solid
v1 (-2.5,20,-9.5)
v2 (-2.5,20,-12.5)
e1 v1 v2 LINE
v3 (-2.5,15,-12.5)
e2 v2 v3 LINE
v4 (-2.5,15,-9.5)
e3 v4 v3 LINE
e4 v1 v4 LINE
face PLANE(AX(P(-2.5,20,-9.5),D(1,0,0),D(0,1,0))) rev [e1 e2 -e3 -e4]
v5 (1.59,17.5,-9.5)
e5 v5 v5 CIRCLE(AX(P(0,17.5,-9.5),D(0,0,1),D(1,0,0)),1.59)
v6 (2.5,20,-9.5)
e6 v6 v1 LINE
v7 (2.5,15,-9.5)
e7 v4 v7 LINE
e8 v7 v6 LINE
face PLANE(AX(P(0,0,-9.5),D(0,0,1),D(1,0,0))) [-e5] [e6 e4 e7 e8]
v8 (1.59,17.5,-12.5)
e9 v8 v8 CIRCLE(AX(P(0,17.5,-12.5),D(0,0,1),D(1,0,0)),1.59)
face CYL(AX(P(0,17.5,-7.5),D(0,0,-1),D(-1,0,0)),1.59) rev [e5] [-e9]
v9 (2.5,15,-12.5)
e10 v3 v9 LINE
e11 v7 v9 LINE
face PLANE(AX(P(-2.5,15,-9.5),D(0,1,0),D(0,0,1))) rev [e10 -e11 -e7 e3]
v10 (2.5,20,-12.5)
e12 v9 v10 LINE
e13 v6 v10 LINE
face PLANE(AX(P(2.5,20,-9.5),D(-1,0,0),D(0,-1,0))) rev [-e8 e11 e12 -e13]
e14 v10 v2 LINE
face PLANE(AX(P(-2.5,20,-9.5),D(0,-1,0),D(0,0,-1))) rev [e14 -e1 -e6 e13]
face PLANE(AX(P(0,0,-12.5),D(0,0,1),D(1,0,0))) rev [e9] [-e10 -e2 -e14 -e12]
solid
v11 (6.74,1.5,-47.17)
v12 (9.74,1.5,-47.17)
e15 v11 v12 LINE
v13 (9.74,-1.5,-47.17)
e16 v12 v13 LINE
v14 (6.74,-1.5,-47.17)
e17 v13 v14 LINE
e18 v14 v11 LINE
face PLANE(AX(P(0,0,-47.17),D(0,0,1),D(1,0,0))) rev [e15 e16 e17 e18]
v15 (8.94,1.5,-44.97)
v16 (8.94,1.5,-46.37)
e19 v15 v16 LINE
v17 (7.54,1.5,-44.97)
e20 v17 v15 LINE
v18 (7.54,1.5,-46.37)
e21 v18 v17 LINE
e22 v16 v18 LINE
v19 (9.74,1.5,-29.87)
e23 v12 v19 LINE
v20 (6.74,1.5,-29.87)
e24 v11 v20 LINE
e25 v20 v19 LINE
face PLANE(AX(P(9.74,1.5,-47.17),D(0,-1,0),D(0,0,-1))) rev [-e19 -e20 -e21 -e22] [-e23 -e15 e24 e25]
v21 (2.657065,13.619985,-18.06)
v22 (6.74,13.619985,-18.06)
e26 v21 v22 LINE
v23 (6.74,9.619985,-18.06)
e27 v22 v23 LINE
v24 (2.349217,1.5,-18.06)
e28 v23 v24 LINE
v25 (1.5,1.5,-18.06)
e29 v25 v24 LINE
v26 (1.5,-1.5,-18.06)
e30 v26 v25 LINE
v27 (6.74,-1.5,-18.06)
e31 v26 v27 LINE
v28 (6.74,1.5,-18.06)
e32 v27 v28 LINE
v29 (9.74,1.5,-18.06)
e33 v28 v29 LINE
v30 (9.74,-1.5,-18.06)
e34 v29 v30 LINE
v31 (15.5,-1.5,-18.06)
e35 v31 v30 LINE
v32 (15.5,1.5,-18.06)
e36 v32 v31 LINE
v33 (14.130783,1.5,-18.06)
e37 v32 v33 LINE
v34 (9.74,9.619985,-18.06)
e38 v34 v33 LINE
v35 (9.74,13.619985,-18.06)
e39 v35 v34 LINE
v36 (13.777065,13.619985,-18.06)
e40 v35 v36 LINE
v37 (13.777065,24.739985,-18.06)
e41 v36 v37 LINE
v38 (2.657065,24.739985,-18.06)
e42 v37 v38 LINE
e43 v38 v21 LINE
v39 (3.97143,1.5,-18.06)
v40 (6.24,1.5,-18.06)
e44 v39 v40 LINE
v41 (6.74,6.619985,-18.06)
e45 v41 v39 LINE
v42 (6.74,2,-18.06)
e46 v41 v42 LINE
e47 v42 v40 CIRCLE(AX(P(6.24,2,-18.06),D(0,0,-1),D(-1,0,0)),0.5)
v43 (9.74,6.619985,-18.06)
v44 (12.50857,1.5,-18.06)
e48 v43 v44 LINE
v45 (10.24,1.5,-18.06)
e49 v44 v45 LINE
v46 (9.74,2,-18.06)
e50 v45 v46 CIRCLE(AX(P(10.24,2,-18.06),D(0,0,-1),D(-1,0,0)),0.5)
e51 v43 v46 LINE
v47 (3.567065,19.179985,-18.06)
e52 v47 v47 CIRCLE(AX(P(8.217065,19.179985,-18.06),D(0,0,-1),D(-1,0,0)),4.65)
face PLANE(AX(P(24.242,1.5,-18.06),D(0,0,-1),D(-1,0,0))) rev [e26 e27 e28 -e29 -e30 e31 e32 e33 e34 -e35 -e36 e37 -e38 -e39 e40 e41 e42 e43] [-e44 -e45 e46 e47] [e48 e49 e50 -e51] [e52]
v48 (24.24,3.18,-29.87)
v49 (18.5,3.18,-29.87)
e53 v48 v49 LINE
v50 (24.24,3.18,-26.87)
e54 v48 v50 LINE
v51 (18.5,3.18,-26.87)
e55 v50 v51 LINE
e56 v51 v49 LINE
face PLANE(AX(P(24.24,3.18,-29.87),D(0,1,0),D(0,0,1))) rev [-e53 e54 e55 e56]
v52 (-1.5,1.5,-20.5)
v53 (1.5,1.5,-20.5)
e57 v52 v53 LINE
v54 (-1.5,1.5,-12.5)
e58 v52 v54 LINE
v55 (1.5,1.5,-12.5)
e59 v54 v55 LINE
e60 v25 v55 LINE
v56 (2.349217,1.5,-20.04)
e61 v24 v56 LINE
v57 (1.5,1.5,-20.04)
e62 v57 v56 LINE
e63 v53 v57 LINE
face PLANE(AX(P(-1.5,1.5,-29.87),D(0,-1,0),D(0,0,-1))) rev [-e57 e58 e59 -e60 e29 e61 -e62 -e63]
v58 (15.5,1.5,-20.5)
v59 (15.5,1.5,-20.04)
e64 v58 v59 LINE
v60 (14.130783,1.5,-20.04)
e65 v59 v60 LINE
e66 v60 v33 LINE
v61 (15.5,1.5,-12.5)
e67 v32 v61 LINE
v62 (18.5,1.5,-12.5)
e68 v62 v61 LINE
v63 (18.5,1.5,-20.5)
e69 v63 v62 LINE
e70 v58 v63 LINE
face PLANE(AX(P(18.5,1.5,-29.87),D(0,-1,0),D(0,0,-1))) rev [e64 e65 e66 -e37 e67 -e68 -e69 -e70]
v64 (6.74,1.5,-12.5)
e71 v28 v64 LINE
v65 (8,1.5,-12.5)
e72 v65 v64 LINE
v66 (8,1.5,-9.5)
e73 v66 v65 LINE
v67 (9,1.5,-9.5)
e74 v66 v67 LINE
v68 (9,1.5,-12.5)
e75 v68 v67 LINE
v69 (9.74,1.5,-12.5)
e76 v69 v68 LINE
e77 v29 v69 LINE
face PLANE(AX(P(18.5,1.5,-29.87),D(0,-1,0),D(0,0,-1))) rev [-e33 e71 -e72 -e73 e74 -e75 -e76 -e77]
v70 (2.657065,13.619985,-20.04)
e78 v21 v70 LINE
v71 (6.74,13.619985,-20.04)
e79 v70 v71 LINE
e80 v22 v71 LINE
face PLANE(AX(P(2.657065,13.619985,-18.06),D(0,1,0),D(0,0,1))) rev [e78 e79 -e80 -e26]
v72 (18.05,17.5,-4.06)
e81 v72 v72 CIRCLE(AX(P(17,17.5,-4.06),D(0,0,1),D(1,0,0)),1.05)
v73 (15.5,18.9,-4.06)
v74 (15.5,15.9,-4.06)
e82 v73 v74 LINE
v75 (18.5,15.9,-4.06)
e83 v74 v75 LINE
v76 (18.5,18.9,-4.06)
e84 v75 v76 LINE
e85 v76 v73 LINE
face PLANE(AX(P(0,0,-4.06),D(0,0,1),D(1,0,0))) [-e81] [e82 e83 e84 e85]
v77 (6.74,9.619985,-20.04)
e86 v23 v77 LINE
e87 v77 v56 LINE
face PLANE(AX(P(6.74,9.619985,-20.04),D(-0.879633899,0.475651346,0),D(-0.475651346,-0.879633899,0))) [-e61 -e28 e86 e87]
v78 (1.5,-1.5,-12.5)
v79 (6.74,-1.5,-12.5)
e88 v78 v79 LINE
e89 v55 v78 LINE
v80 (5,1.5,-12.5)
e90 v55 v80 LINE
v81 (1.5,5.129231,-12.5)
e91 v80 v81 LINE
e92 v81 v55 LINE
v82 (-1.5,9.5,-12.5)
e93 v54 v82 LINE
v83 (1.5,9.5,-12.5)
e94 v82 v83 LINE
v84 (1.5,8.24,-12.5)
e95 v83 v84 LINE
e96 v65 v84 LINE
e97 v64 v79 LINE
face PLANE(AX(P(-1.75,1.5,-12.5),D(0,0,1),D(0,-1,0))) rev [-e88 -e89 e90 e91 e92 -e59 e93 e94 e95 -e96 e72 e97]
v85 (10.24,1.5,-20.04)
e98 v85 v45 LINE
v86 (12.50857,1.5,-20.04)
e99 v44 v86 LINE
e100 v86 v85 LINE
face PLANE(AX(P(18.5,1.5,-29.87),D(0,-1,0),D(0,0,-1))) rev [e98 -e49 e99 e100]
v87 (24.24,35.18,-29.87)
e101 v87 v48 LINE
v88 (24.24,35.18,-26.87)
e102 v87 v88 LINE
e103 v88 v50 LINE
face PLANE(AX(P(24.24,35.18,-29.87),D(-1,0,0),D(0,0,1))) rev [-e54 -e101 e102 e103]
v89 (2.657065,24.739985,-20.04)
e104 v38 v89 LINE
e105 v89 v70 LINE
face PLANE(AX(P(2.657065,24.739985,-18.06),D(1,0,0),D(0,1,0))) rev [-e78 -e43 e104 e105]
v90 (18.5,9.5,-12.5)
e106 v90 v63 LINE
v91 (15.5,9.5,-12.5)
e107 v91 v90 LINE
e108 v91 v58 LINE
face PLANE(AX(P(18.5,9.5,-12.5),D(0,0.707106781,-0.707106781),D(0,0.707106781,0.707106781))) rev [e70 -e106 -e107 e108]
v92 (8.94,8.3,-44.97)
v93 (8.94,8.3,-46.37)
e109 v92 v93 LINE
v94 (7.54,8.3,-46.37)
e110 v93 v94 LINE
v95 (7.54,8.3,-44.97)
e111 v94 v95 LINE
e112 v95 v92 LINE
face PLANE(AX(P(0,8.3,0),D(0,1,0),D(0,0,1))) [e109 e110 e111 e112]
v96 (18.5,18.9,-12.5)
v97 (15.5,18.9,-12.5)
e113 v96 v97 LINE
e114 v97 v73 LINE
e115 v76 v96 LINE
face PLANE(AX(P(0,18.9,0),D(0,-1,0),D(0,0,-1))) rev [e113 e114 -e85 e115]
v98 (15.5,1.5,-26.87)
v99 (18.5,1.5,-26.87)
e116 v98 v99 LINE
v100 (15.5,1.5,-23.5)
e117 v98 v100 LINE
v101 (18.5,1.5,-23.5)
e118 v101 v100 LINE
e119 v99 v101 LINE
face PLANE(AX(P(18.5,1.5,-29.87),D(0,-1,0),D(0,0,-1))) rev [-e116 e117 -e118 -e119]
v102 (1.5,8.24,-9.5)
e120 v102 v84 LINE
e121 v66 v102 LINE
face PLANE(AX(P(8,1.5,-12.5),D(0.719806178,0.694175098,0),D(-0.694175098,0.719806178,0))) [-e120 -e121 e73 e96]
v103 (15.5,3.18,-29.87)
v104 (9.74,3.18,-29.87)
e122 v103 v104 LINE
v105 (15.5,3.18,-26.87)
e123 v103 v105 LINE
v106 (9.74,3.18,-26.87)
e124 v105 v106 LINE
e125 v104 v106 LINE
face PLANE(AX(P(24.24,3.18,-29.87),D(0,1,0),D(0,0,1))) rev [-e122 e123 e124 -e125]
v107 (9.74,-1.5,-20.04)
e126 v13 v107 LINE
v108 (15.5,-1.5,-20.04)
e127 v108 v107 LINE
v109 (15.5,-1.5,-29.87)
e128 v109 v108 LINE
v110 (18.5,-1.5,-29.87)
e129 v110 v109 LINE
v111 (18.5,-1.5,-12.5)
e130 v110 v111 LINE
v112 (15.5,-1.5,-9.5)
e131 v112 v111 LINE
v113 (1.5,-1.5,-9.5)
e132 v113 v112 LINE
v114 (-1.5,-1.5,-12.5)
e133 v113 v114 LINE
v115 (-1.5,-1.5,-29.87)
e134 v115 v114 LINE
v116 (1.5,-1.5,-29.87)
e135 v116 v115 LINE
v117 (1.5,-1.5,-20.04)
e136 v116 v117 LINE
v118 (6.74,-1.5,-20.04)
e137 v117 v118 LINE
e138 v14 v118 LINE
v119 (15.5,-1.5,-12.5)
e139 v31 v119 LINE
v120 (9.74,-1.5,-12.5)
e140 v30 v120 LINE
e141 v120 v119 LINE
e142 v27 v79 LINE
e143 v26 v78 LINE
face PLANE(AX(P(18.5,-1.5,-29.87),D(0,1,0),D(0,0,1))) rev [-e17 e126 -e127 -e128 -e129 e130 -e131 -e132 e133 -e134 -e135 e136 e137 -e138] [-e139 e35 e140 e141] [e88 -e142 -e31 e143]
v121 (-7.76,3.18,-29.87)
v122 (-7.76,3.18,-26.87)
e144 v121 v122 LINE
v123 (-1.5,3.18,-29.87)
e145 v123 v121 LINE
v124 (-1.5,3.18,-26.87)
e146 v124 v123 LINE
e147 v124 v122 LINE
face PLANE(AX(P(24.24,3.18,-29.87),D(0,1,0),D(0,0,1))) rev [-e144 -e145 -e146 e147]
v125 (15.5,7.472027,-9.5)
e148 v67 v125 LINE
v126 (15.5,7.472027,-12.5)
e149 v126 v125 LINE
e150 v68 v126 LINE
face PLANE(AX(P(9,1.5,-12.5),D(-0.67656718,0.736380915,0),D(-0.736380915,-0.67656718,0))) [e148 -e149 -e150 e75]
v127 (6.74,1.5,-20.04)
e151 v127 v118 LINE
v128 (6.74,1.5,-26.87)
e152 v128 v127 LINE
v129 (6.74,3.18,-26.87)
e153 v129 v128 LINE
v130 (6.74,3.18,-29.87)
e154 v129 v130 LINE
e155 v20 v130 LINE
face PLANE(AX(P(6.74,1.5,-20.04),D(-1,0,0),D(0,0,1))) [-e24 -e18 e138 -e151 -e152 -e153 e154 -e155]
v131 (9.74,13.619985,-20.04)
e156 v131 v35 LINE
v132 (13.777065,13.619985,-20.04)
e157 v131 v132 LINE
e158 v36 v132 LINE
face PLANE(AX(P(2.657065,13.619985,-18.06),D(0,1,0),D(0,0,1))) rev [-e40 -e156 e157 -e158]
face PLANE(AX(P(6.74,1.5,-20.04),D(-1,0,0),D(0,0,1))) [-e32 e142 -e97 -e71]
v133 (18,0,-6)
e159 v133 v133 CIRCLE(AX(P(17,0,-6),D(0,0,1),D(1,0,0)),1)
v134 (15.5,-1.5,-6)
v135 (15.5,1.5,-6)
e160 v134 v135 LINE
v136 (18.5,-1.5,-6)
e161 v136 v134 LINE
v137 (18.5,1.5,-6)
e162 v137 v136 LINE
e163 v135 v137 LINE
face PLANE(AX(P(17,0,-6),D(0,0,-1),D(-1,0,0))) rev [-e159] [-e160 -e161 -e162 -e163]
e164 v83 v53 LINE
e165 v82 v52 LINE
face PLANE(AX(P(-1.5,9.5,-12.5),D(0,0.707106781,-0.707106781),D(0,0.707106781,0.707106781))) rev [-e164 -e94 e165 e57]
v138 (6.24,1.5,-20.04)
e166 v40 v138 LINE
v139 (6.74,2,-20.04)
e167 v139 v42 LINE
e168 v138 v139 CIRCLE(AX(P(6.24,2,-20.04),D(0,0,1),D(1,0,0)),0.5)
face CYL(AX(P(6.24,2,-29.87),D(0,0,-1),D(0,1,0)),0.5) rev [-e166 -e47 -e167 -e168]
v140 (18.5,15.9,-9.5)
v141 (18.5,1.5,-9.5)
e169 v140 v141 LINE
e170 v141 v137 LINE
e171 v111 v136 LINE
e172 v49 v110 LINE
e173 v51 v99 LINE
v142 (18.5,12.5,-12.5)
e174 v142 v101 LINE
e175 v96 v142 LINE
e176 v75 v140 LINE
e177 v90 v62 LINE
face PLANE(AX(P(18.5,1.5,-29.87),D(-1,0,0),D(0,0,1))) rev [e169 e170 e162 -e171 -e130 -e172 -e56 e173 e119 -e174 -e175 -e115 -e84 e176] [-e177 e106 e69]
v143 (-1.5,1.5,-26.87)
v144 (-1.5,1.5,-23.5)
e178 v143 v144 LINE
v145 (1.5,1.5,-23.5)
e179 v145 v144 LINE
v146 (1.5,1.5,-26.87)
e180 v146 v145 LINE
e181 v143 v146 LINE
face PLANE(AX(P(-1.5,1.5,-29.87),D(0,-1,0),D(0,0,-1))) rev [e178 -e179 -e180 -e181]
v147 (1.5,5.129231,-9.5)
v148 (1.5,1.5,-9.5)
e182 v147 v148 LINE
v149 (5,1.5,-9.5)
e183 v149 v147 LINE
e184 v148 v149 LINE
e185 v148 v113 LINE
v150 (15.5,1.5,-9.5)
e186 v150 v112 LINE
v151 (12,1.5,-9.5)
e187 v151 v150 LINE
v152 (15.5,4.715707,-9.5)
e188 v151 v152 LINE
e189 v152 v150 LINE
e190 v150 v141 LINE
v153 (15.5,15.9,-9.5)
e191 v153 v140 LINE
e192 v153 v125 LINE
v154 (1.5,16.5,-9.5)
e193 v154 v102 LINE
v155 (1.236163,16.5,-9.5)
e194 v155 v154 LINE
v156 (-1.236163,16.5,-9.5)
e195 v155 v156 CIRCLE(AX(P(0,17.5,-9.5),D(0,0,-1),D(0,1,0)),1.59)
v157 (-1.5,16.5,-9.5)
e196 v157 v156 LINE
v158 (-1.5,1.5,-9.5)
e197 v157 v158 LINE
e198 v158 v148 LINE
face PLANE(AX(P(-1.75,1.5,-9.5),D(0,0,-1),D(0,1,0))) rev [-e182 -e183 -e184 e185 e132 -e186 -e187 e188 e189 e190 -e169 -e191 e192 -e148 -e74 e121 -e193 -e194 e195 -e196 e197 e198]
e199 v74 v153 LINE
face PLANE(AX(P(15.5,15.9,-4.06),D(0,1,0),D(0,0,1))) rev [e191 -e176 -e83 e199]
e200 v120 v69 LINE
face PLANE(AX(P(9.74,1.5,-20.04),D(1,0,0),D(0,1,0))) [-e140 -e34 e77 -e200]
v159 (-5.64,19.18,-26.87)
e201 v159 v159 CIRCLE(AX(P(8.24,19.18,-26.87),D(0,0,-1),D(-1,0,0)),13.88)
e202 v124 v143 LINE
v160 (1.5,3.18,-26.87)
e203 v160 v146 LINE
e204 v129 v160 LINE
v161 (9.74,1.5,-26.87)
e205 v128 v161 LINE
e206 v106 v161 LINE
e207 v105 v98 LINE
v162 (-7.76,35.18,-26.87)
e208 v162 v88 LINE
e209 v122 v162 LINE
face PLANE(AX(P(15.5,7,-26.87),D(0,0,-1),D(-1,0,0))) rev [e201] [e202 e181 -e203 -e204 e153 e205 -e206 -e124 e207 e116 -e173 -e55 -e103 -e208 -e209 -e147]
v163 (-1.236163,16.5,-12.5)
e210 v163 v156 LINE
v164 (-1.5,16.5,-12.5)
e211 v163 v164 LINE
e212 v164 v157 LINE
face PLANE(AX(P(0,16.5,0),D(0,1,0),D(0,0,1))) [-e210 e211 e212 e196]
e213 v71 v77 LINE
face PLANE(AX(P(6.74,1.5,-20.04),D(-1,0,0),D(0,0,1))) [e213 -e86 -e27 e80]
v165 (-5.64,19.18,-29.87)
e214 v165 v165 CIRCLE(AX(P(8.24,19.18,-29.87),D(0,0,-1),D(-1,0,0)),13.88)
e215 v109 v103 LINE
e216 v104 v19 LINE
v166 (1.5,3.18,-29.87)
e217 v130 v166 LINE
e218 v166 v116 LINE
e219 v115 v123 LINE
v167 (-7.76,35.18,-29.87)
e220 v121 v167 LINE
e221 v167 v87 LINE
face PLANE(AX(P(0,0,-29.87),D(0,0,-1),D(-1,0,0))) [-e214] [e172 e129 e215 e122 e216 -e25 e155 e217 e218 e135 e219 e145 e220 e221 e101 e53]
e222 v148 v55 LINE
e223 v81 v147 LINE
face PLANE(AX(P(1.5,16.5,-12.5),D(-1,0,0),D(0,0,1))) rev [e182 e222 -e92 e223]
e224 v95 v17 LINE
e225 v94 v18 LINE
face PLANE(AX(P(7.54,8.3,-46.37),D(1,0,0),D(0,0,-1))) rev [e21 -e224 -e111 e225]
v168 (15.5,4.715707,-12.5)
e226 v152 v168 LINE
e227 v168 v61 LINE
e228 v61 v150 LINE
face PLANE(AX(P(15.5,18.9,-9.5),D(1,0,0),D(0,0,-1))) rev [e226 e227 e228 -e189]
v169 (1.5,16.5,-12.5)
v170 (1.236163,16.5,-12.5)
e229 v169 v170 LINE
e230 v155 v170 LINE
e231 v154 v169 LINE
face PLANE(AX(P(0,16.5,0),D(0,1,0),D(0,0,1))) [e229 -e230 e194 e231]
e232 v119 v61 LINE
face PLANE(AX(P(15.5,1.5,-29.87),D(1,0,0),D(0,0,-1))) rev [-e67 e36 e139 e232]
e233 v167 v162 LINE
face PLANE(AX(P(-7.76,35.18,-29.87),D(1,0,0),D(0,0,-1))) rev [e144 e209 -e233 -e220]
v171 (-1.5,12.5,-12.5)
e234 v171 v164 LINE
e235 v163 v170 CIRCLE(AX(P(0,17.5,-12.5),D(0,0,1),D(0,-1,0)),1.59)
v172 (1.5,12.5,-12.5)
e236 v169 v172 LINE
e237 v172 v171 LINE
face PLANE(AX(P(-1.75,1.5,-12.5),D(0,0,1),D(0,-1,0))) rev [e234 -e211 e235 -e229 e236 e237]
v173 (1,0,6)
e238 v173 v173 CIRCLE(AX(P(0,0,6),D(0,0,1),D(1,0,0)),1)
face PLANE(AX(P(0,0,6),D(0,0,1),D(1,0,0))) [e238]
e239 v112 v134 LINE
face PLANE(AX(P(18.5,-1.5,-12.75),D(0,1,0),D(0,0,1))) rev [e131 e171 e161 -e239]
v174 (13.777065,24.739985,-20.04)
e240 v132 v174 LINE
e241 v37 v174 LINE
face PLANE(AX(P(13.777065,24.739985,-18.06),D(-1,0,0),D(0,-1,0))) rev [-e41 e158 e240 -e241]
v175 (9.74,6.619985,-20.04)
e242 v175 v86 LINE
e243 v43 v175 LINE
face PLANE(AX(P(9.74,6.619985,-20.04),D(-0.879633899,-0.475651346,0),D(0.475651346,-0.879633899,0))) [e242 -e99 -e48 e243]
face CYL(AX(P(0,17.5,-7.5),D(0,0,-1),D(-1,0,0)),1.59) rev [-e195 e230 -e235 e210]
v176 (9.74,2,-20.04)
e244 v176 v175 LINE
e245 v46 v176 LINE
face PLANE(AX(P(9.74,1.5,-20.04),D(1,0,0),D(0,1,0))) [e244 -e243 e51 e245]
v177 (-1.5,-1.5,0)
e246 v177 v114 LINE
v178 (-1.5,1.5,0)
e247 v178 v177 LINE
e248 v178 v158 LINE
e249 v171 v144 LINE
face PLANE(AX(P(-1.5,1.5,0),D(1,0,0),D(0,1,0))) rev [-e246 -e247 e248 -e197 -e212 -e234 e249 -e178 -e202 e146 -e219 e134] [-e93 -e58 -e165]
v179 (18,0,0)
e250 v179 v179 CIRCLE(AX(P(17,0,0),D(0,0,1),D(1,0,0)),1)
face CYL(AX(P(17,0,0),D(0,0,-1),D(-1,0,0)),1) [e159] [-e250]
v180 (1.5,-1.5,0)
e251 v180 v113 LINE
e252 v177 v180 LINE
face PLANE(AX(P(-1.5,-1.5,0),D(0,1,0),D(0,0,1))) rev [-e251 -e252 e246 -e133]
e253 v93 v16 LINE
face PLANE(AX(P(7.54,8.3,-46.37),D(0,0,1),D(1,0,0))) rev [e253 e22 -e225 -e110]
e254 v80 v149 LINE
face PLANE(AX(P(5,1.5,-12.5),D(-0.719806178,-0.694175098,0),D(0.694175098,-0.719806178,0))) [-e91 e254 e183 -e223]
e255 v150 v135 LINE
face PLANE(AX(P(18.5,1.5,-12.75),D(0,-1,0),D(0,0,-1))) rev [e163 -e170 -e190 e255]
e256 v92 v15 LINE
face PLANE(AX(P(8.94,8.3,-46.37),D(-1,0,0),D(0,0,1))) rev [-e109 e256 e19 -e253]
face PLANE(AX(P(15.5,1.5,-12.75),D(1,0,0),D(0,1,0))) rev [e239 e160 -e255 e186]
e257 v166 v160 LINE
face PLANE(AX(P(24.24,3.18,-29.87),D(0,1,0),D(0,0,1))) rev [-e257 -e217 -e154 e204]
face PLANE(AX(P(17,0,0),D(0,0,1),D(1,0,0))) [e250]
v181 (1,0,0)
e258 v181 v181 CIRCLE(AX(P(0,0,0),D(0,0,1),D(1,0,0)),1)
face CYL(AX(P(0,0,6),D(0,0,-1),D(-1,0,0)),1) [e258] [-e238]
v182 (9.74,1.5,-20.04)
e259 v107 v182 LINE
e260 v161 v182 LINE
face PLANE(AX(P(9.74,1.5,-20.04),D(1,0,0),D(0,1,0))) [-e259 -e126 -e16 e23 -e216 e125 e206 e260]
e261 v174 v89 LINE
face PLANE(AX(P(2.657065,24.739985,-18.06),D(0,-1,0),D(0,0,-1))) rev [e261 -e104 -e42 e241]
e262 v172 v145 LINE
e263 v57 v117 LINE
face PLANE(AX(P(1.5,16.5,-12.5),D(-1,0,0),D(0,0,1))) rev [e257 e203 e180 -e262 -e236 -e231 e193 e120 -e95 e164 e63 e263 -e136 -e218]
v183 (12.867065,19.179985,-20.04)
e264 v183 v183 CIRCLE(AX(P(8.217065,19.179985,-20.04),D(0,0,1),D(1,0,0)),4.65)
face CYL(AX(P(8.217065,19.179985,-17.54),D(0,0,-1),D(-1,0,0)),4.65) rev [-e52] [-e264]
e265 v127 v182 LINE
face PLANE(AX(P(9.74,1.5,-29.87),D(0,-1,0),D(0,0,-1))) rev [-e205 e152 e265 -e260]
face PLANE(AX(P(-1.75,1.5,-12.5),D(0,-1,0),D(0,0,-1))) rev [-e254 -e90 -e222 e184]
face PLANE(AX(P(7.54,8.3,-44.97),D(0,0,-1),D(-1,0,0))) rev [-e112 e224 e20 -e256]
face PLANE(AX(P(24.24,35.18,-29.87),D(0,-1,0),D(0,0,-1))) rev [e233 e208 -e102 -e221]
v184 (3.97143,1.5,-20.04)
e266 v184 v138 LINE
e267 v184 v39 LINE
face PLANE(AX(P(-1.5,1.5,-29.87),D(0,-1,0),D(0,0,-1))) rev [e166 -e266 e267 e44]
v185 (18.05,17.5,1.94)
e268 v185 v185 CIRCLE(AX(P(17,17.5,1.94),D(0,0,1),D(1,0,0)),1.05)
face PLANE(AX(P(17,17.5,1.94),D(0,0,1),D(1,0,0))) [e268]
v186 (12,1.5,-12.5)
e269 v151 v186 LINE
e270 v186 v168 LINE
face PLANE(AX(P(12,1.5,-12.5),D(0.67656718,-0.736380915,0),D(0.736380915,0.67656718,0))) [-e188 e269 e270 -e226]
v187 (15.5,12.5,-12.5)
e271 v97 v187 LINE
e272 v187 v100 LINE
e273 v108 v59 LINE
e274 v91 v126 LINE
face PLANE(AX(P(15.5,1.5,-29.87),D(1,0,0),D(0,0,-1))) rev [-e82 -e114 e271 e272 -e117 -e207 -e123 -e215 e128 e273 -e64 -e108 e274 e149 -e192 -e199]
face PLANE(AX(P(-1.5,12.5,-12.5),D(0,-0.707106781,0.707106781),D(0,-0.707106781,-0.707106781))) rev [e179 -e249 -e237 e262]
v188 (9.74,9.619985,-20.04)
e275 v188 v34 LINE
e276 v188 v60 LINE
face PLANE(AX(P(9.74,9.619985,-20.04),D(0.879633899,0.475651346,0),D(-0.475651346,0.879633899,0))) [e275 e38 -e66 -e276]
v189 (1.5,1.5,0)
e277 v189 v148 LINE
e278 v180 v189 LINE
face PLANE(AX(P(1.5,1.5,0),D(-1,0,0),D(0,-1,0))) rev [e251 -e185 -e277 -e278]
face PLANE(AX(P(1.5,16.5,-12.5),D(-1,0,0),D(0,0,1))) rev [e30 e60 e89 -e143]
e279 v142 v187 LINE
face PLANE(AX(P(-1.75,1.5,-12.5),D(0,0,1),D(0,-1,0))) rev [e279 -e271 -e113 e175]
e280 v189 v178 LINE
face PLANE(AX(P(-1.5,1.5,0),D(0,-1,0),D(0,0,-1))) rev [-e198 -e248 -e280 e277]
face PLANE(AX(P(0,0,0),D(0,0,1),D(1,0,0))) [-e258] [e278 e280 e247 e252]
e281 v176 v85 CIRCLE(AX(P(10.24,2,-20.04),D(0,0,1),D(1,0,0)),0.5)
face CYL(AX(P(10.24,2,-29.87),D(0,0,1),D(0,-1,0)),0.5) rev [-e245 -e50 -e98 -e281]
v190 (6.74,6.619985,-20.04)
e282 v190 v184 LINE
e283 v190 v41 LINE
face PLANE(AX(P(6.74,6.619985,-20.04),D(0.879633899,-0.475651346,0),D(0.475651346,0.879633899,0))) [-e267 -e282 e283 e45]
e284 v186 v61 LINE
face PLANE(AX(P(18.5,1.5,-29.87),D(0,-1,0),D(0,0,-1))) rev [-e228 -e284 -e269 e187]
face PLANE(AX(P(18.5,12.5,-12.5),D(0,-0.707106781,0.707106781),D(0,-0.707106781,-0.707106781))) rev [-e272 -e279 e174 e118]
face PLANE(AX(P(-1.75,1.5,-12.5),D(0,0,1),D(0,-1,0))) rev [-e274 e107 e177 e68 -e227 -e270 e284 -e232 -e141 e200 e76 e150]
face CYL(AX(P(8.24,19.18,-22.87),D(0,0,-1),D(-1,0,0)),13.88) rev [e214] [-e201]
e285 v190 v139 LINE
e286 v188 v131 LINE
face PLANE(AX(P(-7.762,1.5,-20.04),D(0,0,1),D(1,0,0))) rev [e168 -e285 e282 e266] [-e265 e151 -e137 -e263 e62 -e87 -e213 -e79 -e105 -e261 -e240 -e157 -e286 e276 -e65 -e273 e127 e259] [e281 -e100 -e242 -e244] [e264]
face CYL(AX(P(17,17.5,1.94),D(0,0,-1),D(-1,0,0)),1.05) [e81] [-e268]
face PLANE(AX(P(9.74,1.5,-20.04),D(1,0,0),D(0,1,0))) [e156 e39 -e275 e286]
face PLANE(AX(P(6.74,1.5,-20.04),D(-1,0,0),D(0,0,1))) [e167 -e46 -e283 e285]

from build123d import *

# Parameters (mm, degrees)
SKETCH3_W            = 3
SKETCH3_H            = 3
SKETCH7_W            = 3
SKETCH7_H            = 3
BOSS_EXTRUDE1_DEPTH  = 16.5
SKETCH12_W           = 5
SKETCH12_H           = 5
BOSS_EXTRUDE4_DEPTH  = 1.5
SKETCH17_R           = 1
BOSS_EXTRUDE5_DEPTH  = 6
SKETCH18_R           = 1
BOSS_EXTRUDE6_DEPTH  = 6
SKETCH19_W           = 3
SKETCH19_H           = 3
BOSS_EXTRUDE7_DEPTH  = 7.54
SKETCH21_W           = 3
SKETCH21_H           = 1.98
BOSS_EXTRUDE8_DEPTH  = 17.68
SKETCH22_W           = 11.12
SKETCH22_H           = 11.12
BOSS_EXTRUDE9_DEPTH  = 0.99
SKETCH23_R           = 4.65
CUT_EXTRUDE2_DEPTH   = 2.5
SKETCH24_W           = 3
SKETCH24_H           = 3
BOSS_EXTRUDE10_DEPTH = 9.83
SKETCH25_W           = 3
SKETCH25_H           = 3
BOSS_EXTRUDE11_DEPTH = 3
SKETCH27_W           = 32
SKETCH27_H           = 32
BOSS_EXTRUDE12_DEPTH = 1.5
SKETCH28_R           = 13.88
CUT_EXTRUDE3_DEPTH   = 7
SKETCH31_W           = 3
SKETCH31_H           = 3
BOSS_EXTRUDE13_DEPTH = 17.3
SKETCH32_W           = 1.4
SKETCH32_H           = 1.4
BOSS_EXTRUDE14_DEPTH = 6.8
SKETCH33_W           = 3
SKETCH33_H           = 3
BOSS_EXTRUDE15_DEPTH = 17.37
SKETCH34_W           = 3
SKETCH34_H           = 3
BOSS_EXTRUDE16_DEPTH = 5.5
SKETCH36_W           = 3
SKETCH36_H           = 3
SKETCH16_R           = 1.59
CUT_EXTRUDE7_DEPTH   = 5
SKETCH41_W           = 3
SKETCH41_H           = 3
BOSS_EXTRUDE17_DEPTH = 17.37
SKETCH42_W           = 3
SKETCH42_H           = 3
BOSS_EXTRUDE18_DEPTH = 5
SKETCH43_W           = 3
SKETCH43_H           = 3
BOSS_EXTRUDE19_DEPTH = 17.4
SKETCH47_W           = 3
SKETCH47_H           = 3
SKETCH53_W           = 3
SKETCH53_H           = 3
BOSS_EXTRUDE20_REACH = 63.391
SKETCH55_W           = 1.98
SKETCH55_H           = 3
BOSS_EXTRUDE21_REACH = 63.391
SKETCH56_W           = 1.98
SKETCH56_H           = 3
FILLET1_R            = 0.5
FILLET2_R            = 0.5
SKETCH57_W           = 1.98
SKETCH57_H           = 3
SKETCH59_W           = 3
SKETCH59_H           = 3
BOSS_EXTRUDE22_DEPTH = 5.44
SKETCH63_R           = 1.05
BOSS_EXTRUDE25_DEPTH = 6


with BuildPart() as part:
    # Sweep3: sweep along a path in Sketch4
    with BuildLine(Plane(origin=(0, 0, 0), x_dir=(1, 0, 0), z_dir=(0, 1, 0))) as sweep3_path:
        Line((0, 0), (0, 11))
        Line((0, 11), (17, 11))
        Line((17, 11), (17, 6))
    # Sketch3 → Sweep3 (sweep)
    with BuildSketch(Plane.XY):
        Rectangle(SKETCH3_W, SKETCH3_H)
    sweep(path=sweep3_path.line, transition=Transition.RIGHT)

    # Sketch7 → Boss-Extrude1 (add)
    with BuildSketch(Plane(origin=(0, 0, 0), x_dir=(1, 0, 0), z_dir=(0, 1, 0))):
        with Locations((0, 11)):
            Rectangle(SKETCH7_W, SKETCH7_H)
    extrude(amount=BOSS_EXTRUDE1_DEPTH)

    # Sketch17 → Boss-Extrude5 (add)
    with BuildSketch(Plane.XY):
        Circle(SKETCH17_R)
    extrude(amount=BOSS_EXTRUDE5_DEPTH)

    # Sketch18 → Boss-Extrude6 (add)
    with BuildSketch(Plane.XY.offset(-6)):
        with Locations((17, 0)):
            Circle(SKETCH18_R)
    extrude(amount=BOSS_EXTRUDE6_DEPTH)

    # Sweep4: sweep along a path in Sketch39
    with BuildLine(Plane.XY.offset(-11)) as sweep4_path:
        Line((6.5, 1.5), (0, 8.24))
    # Sketch36 → Sweep4 (sweep)
    with BuildSketch(Plane(origin=(0, 1.5, 0), x_dir=(1, 0, 0), z_dir=(0, 1, 0))):
        with Locations((6.5, 11)):
            Rectangle(SKETCH36_W, SKETCH36_H)
    sweep(path=sweep4_path.line)


with BuildPart() as body_2:
    # Sketch12 → Boss-Extrude4 (new, symmetric)
    with BuildSketch(Plane.XY.offset(-11)):
        with Locations((0, 17.5)):
            Rectangle(SKETCH12_W, SKETCH12_H)
    extrude(amount=BOSS_EXTRUDE4_DEPTH, both=True)


with BuildPart() as body_3:
    # Sketch19 → Boss-Extrude7 (new body)
    with BuildSketch(Plane.XY.offset(-12.5)):
        with Locations((8.24, 0)):
            Rectangle(SKETCH19_W, SKETCH19_H)
    extrude(amount=-BOSS_EXTRUDE7_DEPTH)

    # Sketch21 → Boss-Extrude8 (add)
    with BuildSketch(Plane(origin=(0, 1.5, 0), x_dir=(1, 0, 0), z_dir=(0, 1, 0))):
        with Locations((8.24, 19.05)):
            Rectangle(SKETCH21_W, SKETCH21_H)
    extrude(amount=BOSS_EXTRUDE8_DEPTH)

    # Sketch22 → Boss-Extrude9 (add, symmetric)
    with BuildSketch(Plane.XY.offset(-19.05)):
        with Locations((8.217064706, 19.179985124)):
            Rectangle(SKETCH22_W, SKETCH22_H)
    extrude(amount=BOSS_EXTRUDE9_DEPTH, both=True)

    # Sketch23 → Cut-Extrude2 (cut, symmetric)
    with BuildSketch(Plane(origin=(0, 0, -20.04), x_dir=(-1, 0, 0), z_dir=(0, 0, -1))):
        with Locations((-8.217064706, 19.179985124)):
            Circle(SKETCH23_R)
    extrude(amount=CUT_EXTRUDE2_DEPTH, both=True, mode=Mode.SUBTRACT)

    # Sketch24 → Boss-Extrude10 (add)
    with BuildSketch(Plane(origin=(0, 0, -20.04), x_dir=(-1, 0, 0), z_dir=(0, 0, -1))):
        with Locations((-8.24, 0)):
            Rectangle(SKETCH24_W, SKETCH24_H)
    extrude(amount=BOSS_EXTRUDE10_DEPTH)

    # Sketch25 → Boss-Extrude11 (add)
    with BuildSketch(Plane(origin=(0, 1.5, 0), x_dir=(1, 0, 0), z_dir=(0, 1, 0))):
        with Locations((8.24, 28.37)):
            Rectangle(SKETCH25_W, SKETCH25_H)
    extrude(amount=BOSS_EXTRUDE11_DEPTH)

    # Sketch27 → Boss-Extrude12 (add, symmetric)
    with BuildSketch(Plane(origin=(0, 0, -28.37), x_dir=(-1, 0, 0), z_dir=(0, 0, -1))):
        with Locations((-8.24, 19.18)):
            Rectangle(SKETCH27_W, SKETCH27_H)
    extrude(amount=BOSS_EXTRUDE12_DEPTH, both=True)

    # Sketch28 → Cut-Extrude3 (cut)
    with BuildSketch(Plane(origin=(0, 0, -29.87), x_dir=(-1, 0, 0), z_dir=(0, 0, -1))):
        with Locations((-8.24, 19.18)):
            Circle(SKETCH28_R)
    extrude(amount=-CUT_EXTRUDE3_DEPTH, mode=Mode.SUBTRACT)

    # Sketch31 → Boss-Extrude13 (add)
    with BuildSketch(Plane(origin=(0, 0, -29.87), x_dir=(-1, 0, 0), z_dir=(0, 0, -1))):
        with Locations((-8.24, 0)):
            Rectangle(SKETCH31_W, SKETCH31_H)
    extrude(amount=BOSS_EXTRUDE13_DEPTH)

    # Sketch32 → Boss-Extrude14 (add)
    with BuildSketch(Plane(origin=(0, 1.5, 0), x_dir=(1, 0, 0), z_dir=(0, 1, 0))):
        with Locations((8.24, 45.67)):
            Rectangle(SKETCH32_W, SKETCH32_H)
    extrude(amount=BOSS_EXTRUDE14_DEPTH)



with BuildPart() as body_4:
    # Sketch33 → Boss-Extrude15 (new body)
    with BuildSketch(Plane(origin=(0, 0, -12.5), x_dir=(-1, 0, 0), z_dir=(0, 0, -1))):
        with Locations((-17, 0)):
            Rectangle(SKETCH33_W, SKETCH33_H)
    extrude(amount=BOSS_EXTRUDE15_DEPTH)

    # Sketch34 → Boss-Extrude16 (add)
    with BuildSketch(Plane(origin=(0, 1.5, 0), x_dir=(1, 0, 0), z_dir=(0, 1, 0))):
        with Locations((17, 28.37)):
            Rectangle(SKETCH34_W, SKETCH34_H)
    extrude(amount=BOSS_EXTRUDE16_DEPTH)


with BuildPart() as cut_extrude7_tool:
    # Sketch16 → Cut-Extrude7 (new, symmetric)
    with BuildSketch(Plane(origin=(0, 0, -12.5), x_dir=(-1, 0, 0), z_dir=(0, 0, -1))):
        with Locations(Location((0, 17.5, 0), (0, 0, 180))):
            Circle(SKETCH16_R)
    extrude(amount=CUT_EXTRUDE7_DEPTH, both=True)


with BuildPart() as part_1:
    add(part.part)

    # Cut-Extrude7: cut by cut_extrude7_tool
    add(cut_extrude7_tool.part, mode=Mode.SUBTRACT)


with BuildPart() as body_2_1:
    add(body_2.part)

    # Cut-Extrude7: cut by cut_extrude7_tool
    add(cut_extrude7_tool.part, mode=Mode.SUBTRACT)


with BuildPart() as body_3_1:
    add(body_3.part)

    add(part_1.part)  # Boss-Extrude17 merges part
    # Sketch41 → Boss-Extrude17 (add)
    with BuildSketch(Plane(origin=(0, 0, -12.5), x_dir=(-1, 0, 0), z_dir=(0, 0, -1))):
        Rectangle(SKETCH41_W, SKETCH41_H)
    extrude(amount=BOSS_EXTRUDE17_DEPTH)

    # Sketch42 → Boss-Extrude18 (add)
    with BuildSketch(Plane(origin=(0, 1.5, 0), x_dir=(1, 0, 0), z_dir=(0, 1, 0))):
        with Locations((0, 28.37)):
            Rectangle(SKETCH42_W, SKETCH42_H)
    extrude(amount=BOSS_EXTRUDE18_DEPTH)


    add(body_4.part)  # Boss-Extrude19 merges body 4
    # Sketch43 → Boss-Extrude19 (add)
    with BuildSketch(Plane(origin=(0, 1.5, 0), x_dir=(1, 0, 0), z_dir=(0, 1, 0))):
        with Locations((17, 11)):
            Rectangle(SKETCH43_W, SKETCH43_H)
    extrude(amount=BOSS_EXTRUDE19_DEPTH)

    # Sweep5: sweep along a path in Sketch51
    with BuildLine(Plane.XY.offset(-11)) as sweep5_path:
        Line((10.5, 1.5), (17, 7.472026952))
    # Sketch47 → Sweep5 (sweep)
    with BuildSketch(Plane(origin=(0, 1.5, 0), x_dir=(1, 0, 0), z_dir=(0, 1, 0))):
        with Locations((10.5, 11)):
            Rectangle(SKETCH47_W, SKETCH47_H)
    sweep(path=sweep5_path.line)

    # Sweep6: sweep along a path in Sketch54
    with BuildLine(Plane.ZY.offset(1.5)) as sweep6_path:
        Line((-12.5, 11), (-23.5, 0))
    # Sketch53 → Sweep6 (sweep)
    with BuildSketch(Plane.XY.offset(-12.5)):
        with Locations((0, 11)):
            Rectangle(SKETCH53_W, SKETCH53_H)
    sweep6 = sweep(path=sweep6_path.line)

    # Mirror11: Sweep6 across plane
    add(sweep6.mirror(Plane.ZY.offset(-8.5)))

    # Sketch55 → Boss-Extrude20 (add, up to next)
    with BuildSketch(Plane.ZY.offset(-6.74), mode=Mode.PRIVATE) as boss_extrude20_sk1:
        with Locations((-19.05, 0)):
            Rectangle(SKETCH55_W, SKETCH55_H)
    boss_extrude20_tool1 = extrude(boss_extrude20_sk1.sketch, amount=BOSS_EXTRUDE20_REACH, mode=Mode.PRIVATE) - body_3_1.part
    add(boss_extrude20_tool1.solids().sort_by_distance((6.74, 0, -19.05))[0])

    # Sketch56 → Boss-Extrude21 (add, up to next)
    with BuildSketch(Plane(origin=(9.74, 0, 0), x_dir=(0, 0, -1), z_dir=(1, 0, 0)), mode=Mode.PRIVATE) as boss_extrude21_sk1:
        with Locations((19.05, 0)):
            Rectangle(SKETCH56_W, SKETCH56_H)
    boss_extrude21_tool1 = extrude(boss_extrude21_sk1.sketch, amount=BOSS_EXTRUDE21_REACH, mode=Mode.PRIVATE) - body_3_1.part
    add(boss_extrude21_tool1.solids().sort_by_distance((9.74, 0, -19.05))[0])

    # Fillet1
    # the kernel refuses this fillet: 0.5 mm, written as the material it adds along each edge
    with BuildSketch(Plane(origin=(6.74, 1.5, -20.04), x_dir=(-1, 0, 0), z_dir=(0, 0, 1))) as fillet1_piece_1:
        with BuildLine():
            CenterArc((FILLET1_R, -FILLET1_R), FILLET1_R, 90, 90)
            Line((0, -FILLET1_R), (0, 0))
            Line((0, 0), (FILLET1_R, 0))
        make_face()
    extrude(amount=1.98)

    # Fillet2
    # the kernel refuses this fillet: 0.5 mm, written as the material it adds along each edge
    with BuildSketch(Plane(origin=(9.74, 1.5, -18.06), x_dir=(0, 1, 0), z_dir=(0, 0, -1))) as fillet2_piece_1:
        with BuildLine():
            CenterArc((FILLET2_R, FILLET2_R), FILLET2_R, 180, 90)
            Line((0, FILLET2_R), (0, 0))
            Line((0, 0), (FILLET2_R, 0))
        make_face()
    extrude(amount=1.98)

    # Sweep7: sweep along a path in Sketch58
    with BuildLine(Plane.XY.offset(-19.05)) as sweep7_path:
        Line((6.74, 8.119985124), (2.349216677, 0))
    # Sketch57 → Sweep7 (sweep)
    with BuildSketch(Plane.ZY.offset(-6.74)):
        with Locations((-19.05, 8.119985124)):
            Rectangle(SKETCH57_W, SKETCH57_H)
    sweep7 = sweep(path=sweep7_path.line)

    # Mirror13: Sweep7 across plane
    add(sweep7.mirror(Plane.ZY.offset(-8.24)))

    # Sketch59 → Boss-Extrude22 (add)
    with BuildSketch(Plane.XY.offset(-9.5)):
        with Locations((17, 17.4)):
            Rectangle(SKETCH59_W, SKETCH59_H)
    extrude(amount=BOSS_EXTRUDE22_DEPTH)

    # Sketch63 → Boss-Extrude25 (add)
    with BuildSketch(Plane.XY.offset(-4.06)):
        with Locations((17, 17.5)):
            Circle(SKETCH63_R)
    extrude(amount=BOSS_EXTRUDE25_DEPTH)


solid = Compound([body_2_1.part, body_3_1.part])
